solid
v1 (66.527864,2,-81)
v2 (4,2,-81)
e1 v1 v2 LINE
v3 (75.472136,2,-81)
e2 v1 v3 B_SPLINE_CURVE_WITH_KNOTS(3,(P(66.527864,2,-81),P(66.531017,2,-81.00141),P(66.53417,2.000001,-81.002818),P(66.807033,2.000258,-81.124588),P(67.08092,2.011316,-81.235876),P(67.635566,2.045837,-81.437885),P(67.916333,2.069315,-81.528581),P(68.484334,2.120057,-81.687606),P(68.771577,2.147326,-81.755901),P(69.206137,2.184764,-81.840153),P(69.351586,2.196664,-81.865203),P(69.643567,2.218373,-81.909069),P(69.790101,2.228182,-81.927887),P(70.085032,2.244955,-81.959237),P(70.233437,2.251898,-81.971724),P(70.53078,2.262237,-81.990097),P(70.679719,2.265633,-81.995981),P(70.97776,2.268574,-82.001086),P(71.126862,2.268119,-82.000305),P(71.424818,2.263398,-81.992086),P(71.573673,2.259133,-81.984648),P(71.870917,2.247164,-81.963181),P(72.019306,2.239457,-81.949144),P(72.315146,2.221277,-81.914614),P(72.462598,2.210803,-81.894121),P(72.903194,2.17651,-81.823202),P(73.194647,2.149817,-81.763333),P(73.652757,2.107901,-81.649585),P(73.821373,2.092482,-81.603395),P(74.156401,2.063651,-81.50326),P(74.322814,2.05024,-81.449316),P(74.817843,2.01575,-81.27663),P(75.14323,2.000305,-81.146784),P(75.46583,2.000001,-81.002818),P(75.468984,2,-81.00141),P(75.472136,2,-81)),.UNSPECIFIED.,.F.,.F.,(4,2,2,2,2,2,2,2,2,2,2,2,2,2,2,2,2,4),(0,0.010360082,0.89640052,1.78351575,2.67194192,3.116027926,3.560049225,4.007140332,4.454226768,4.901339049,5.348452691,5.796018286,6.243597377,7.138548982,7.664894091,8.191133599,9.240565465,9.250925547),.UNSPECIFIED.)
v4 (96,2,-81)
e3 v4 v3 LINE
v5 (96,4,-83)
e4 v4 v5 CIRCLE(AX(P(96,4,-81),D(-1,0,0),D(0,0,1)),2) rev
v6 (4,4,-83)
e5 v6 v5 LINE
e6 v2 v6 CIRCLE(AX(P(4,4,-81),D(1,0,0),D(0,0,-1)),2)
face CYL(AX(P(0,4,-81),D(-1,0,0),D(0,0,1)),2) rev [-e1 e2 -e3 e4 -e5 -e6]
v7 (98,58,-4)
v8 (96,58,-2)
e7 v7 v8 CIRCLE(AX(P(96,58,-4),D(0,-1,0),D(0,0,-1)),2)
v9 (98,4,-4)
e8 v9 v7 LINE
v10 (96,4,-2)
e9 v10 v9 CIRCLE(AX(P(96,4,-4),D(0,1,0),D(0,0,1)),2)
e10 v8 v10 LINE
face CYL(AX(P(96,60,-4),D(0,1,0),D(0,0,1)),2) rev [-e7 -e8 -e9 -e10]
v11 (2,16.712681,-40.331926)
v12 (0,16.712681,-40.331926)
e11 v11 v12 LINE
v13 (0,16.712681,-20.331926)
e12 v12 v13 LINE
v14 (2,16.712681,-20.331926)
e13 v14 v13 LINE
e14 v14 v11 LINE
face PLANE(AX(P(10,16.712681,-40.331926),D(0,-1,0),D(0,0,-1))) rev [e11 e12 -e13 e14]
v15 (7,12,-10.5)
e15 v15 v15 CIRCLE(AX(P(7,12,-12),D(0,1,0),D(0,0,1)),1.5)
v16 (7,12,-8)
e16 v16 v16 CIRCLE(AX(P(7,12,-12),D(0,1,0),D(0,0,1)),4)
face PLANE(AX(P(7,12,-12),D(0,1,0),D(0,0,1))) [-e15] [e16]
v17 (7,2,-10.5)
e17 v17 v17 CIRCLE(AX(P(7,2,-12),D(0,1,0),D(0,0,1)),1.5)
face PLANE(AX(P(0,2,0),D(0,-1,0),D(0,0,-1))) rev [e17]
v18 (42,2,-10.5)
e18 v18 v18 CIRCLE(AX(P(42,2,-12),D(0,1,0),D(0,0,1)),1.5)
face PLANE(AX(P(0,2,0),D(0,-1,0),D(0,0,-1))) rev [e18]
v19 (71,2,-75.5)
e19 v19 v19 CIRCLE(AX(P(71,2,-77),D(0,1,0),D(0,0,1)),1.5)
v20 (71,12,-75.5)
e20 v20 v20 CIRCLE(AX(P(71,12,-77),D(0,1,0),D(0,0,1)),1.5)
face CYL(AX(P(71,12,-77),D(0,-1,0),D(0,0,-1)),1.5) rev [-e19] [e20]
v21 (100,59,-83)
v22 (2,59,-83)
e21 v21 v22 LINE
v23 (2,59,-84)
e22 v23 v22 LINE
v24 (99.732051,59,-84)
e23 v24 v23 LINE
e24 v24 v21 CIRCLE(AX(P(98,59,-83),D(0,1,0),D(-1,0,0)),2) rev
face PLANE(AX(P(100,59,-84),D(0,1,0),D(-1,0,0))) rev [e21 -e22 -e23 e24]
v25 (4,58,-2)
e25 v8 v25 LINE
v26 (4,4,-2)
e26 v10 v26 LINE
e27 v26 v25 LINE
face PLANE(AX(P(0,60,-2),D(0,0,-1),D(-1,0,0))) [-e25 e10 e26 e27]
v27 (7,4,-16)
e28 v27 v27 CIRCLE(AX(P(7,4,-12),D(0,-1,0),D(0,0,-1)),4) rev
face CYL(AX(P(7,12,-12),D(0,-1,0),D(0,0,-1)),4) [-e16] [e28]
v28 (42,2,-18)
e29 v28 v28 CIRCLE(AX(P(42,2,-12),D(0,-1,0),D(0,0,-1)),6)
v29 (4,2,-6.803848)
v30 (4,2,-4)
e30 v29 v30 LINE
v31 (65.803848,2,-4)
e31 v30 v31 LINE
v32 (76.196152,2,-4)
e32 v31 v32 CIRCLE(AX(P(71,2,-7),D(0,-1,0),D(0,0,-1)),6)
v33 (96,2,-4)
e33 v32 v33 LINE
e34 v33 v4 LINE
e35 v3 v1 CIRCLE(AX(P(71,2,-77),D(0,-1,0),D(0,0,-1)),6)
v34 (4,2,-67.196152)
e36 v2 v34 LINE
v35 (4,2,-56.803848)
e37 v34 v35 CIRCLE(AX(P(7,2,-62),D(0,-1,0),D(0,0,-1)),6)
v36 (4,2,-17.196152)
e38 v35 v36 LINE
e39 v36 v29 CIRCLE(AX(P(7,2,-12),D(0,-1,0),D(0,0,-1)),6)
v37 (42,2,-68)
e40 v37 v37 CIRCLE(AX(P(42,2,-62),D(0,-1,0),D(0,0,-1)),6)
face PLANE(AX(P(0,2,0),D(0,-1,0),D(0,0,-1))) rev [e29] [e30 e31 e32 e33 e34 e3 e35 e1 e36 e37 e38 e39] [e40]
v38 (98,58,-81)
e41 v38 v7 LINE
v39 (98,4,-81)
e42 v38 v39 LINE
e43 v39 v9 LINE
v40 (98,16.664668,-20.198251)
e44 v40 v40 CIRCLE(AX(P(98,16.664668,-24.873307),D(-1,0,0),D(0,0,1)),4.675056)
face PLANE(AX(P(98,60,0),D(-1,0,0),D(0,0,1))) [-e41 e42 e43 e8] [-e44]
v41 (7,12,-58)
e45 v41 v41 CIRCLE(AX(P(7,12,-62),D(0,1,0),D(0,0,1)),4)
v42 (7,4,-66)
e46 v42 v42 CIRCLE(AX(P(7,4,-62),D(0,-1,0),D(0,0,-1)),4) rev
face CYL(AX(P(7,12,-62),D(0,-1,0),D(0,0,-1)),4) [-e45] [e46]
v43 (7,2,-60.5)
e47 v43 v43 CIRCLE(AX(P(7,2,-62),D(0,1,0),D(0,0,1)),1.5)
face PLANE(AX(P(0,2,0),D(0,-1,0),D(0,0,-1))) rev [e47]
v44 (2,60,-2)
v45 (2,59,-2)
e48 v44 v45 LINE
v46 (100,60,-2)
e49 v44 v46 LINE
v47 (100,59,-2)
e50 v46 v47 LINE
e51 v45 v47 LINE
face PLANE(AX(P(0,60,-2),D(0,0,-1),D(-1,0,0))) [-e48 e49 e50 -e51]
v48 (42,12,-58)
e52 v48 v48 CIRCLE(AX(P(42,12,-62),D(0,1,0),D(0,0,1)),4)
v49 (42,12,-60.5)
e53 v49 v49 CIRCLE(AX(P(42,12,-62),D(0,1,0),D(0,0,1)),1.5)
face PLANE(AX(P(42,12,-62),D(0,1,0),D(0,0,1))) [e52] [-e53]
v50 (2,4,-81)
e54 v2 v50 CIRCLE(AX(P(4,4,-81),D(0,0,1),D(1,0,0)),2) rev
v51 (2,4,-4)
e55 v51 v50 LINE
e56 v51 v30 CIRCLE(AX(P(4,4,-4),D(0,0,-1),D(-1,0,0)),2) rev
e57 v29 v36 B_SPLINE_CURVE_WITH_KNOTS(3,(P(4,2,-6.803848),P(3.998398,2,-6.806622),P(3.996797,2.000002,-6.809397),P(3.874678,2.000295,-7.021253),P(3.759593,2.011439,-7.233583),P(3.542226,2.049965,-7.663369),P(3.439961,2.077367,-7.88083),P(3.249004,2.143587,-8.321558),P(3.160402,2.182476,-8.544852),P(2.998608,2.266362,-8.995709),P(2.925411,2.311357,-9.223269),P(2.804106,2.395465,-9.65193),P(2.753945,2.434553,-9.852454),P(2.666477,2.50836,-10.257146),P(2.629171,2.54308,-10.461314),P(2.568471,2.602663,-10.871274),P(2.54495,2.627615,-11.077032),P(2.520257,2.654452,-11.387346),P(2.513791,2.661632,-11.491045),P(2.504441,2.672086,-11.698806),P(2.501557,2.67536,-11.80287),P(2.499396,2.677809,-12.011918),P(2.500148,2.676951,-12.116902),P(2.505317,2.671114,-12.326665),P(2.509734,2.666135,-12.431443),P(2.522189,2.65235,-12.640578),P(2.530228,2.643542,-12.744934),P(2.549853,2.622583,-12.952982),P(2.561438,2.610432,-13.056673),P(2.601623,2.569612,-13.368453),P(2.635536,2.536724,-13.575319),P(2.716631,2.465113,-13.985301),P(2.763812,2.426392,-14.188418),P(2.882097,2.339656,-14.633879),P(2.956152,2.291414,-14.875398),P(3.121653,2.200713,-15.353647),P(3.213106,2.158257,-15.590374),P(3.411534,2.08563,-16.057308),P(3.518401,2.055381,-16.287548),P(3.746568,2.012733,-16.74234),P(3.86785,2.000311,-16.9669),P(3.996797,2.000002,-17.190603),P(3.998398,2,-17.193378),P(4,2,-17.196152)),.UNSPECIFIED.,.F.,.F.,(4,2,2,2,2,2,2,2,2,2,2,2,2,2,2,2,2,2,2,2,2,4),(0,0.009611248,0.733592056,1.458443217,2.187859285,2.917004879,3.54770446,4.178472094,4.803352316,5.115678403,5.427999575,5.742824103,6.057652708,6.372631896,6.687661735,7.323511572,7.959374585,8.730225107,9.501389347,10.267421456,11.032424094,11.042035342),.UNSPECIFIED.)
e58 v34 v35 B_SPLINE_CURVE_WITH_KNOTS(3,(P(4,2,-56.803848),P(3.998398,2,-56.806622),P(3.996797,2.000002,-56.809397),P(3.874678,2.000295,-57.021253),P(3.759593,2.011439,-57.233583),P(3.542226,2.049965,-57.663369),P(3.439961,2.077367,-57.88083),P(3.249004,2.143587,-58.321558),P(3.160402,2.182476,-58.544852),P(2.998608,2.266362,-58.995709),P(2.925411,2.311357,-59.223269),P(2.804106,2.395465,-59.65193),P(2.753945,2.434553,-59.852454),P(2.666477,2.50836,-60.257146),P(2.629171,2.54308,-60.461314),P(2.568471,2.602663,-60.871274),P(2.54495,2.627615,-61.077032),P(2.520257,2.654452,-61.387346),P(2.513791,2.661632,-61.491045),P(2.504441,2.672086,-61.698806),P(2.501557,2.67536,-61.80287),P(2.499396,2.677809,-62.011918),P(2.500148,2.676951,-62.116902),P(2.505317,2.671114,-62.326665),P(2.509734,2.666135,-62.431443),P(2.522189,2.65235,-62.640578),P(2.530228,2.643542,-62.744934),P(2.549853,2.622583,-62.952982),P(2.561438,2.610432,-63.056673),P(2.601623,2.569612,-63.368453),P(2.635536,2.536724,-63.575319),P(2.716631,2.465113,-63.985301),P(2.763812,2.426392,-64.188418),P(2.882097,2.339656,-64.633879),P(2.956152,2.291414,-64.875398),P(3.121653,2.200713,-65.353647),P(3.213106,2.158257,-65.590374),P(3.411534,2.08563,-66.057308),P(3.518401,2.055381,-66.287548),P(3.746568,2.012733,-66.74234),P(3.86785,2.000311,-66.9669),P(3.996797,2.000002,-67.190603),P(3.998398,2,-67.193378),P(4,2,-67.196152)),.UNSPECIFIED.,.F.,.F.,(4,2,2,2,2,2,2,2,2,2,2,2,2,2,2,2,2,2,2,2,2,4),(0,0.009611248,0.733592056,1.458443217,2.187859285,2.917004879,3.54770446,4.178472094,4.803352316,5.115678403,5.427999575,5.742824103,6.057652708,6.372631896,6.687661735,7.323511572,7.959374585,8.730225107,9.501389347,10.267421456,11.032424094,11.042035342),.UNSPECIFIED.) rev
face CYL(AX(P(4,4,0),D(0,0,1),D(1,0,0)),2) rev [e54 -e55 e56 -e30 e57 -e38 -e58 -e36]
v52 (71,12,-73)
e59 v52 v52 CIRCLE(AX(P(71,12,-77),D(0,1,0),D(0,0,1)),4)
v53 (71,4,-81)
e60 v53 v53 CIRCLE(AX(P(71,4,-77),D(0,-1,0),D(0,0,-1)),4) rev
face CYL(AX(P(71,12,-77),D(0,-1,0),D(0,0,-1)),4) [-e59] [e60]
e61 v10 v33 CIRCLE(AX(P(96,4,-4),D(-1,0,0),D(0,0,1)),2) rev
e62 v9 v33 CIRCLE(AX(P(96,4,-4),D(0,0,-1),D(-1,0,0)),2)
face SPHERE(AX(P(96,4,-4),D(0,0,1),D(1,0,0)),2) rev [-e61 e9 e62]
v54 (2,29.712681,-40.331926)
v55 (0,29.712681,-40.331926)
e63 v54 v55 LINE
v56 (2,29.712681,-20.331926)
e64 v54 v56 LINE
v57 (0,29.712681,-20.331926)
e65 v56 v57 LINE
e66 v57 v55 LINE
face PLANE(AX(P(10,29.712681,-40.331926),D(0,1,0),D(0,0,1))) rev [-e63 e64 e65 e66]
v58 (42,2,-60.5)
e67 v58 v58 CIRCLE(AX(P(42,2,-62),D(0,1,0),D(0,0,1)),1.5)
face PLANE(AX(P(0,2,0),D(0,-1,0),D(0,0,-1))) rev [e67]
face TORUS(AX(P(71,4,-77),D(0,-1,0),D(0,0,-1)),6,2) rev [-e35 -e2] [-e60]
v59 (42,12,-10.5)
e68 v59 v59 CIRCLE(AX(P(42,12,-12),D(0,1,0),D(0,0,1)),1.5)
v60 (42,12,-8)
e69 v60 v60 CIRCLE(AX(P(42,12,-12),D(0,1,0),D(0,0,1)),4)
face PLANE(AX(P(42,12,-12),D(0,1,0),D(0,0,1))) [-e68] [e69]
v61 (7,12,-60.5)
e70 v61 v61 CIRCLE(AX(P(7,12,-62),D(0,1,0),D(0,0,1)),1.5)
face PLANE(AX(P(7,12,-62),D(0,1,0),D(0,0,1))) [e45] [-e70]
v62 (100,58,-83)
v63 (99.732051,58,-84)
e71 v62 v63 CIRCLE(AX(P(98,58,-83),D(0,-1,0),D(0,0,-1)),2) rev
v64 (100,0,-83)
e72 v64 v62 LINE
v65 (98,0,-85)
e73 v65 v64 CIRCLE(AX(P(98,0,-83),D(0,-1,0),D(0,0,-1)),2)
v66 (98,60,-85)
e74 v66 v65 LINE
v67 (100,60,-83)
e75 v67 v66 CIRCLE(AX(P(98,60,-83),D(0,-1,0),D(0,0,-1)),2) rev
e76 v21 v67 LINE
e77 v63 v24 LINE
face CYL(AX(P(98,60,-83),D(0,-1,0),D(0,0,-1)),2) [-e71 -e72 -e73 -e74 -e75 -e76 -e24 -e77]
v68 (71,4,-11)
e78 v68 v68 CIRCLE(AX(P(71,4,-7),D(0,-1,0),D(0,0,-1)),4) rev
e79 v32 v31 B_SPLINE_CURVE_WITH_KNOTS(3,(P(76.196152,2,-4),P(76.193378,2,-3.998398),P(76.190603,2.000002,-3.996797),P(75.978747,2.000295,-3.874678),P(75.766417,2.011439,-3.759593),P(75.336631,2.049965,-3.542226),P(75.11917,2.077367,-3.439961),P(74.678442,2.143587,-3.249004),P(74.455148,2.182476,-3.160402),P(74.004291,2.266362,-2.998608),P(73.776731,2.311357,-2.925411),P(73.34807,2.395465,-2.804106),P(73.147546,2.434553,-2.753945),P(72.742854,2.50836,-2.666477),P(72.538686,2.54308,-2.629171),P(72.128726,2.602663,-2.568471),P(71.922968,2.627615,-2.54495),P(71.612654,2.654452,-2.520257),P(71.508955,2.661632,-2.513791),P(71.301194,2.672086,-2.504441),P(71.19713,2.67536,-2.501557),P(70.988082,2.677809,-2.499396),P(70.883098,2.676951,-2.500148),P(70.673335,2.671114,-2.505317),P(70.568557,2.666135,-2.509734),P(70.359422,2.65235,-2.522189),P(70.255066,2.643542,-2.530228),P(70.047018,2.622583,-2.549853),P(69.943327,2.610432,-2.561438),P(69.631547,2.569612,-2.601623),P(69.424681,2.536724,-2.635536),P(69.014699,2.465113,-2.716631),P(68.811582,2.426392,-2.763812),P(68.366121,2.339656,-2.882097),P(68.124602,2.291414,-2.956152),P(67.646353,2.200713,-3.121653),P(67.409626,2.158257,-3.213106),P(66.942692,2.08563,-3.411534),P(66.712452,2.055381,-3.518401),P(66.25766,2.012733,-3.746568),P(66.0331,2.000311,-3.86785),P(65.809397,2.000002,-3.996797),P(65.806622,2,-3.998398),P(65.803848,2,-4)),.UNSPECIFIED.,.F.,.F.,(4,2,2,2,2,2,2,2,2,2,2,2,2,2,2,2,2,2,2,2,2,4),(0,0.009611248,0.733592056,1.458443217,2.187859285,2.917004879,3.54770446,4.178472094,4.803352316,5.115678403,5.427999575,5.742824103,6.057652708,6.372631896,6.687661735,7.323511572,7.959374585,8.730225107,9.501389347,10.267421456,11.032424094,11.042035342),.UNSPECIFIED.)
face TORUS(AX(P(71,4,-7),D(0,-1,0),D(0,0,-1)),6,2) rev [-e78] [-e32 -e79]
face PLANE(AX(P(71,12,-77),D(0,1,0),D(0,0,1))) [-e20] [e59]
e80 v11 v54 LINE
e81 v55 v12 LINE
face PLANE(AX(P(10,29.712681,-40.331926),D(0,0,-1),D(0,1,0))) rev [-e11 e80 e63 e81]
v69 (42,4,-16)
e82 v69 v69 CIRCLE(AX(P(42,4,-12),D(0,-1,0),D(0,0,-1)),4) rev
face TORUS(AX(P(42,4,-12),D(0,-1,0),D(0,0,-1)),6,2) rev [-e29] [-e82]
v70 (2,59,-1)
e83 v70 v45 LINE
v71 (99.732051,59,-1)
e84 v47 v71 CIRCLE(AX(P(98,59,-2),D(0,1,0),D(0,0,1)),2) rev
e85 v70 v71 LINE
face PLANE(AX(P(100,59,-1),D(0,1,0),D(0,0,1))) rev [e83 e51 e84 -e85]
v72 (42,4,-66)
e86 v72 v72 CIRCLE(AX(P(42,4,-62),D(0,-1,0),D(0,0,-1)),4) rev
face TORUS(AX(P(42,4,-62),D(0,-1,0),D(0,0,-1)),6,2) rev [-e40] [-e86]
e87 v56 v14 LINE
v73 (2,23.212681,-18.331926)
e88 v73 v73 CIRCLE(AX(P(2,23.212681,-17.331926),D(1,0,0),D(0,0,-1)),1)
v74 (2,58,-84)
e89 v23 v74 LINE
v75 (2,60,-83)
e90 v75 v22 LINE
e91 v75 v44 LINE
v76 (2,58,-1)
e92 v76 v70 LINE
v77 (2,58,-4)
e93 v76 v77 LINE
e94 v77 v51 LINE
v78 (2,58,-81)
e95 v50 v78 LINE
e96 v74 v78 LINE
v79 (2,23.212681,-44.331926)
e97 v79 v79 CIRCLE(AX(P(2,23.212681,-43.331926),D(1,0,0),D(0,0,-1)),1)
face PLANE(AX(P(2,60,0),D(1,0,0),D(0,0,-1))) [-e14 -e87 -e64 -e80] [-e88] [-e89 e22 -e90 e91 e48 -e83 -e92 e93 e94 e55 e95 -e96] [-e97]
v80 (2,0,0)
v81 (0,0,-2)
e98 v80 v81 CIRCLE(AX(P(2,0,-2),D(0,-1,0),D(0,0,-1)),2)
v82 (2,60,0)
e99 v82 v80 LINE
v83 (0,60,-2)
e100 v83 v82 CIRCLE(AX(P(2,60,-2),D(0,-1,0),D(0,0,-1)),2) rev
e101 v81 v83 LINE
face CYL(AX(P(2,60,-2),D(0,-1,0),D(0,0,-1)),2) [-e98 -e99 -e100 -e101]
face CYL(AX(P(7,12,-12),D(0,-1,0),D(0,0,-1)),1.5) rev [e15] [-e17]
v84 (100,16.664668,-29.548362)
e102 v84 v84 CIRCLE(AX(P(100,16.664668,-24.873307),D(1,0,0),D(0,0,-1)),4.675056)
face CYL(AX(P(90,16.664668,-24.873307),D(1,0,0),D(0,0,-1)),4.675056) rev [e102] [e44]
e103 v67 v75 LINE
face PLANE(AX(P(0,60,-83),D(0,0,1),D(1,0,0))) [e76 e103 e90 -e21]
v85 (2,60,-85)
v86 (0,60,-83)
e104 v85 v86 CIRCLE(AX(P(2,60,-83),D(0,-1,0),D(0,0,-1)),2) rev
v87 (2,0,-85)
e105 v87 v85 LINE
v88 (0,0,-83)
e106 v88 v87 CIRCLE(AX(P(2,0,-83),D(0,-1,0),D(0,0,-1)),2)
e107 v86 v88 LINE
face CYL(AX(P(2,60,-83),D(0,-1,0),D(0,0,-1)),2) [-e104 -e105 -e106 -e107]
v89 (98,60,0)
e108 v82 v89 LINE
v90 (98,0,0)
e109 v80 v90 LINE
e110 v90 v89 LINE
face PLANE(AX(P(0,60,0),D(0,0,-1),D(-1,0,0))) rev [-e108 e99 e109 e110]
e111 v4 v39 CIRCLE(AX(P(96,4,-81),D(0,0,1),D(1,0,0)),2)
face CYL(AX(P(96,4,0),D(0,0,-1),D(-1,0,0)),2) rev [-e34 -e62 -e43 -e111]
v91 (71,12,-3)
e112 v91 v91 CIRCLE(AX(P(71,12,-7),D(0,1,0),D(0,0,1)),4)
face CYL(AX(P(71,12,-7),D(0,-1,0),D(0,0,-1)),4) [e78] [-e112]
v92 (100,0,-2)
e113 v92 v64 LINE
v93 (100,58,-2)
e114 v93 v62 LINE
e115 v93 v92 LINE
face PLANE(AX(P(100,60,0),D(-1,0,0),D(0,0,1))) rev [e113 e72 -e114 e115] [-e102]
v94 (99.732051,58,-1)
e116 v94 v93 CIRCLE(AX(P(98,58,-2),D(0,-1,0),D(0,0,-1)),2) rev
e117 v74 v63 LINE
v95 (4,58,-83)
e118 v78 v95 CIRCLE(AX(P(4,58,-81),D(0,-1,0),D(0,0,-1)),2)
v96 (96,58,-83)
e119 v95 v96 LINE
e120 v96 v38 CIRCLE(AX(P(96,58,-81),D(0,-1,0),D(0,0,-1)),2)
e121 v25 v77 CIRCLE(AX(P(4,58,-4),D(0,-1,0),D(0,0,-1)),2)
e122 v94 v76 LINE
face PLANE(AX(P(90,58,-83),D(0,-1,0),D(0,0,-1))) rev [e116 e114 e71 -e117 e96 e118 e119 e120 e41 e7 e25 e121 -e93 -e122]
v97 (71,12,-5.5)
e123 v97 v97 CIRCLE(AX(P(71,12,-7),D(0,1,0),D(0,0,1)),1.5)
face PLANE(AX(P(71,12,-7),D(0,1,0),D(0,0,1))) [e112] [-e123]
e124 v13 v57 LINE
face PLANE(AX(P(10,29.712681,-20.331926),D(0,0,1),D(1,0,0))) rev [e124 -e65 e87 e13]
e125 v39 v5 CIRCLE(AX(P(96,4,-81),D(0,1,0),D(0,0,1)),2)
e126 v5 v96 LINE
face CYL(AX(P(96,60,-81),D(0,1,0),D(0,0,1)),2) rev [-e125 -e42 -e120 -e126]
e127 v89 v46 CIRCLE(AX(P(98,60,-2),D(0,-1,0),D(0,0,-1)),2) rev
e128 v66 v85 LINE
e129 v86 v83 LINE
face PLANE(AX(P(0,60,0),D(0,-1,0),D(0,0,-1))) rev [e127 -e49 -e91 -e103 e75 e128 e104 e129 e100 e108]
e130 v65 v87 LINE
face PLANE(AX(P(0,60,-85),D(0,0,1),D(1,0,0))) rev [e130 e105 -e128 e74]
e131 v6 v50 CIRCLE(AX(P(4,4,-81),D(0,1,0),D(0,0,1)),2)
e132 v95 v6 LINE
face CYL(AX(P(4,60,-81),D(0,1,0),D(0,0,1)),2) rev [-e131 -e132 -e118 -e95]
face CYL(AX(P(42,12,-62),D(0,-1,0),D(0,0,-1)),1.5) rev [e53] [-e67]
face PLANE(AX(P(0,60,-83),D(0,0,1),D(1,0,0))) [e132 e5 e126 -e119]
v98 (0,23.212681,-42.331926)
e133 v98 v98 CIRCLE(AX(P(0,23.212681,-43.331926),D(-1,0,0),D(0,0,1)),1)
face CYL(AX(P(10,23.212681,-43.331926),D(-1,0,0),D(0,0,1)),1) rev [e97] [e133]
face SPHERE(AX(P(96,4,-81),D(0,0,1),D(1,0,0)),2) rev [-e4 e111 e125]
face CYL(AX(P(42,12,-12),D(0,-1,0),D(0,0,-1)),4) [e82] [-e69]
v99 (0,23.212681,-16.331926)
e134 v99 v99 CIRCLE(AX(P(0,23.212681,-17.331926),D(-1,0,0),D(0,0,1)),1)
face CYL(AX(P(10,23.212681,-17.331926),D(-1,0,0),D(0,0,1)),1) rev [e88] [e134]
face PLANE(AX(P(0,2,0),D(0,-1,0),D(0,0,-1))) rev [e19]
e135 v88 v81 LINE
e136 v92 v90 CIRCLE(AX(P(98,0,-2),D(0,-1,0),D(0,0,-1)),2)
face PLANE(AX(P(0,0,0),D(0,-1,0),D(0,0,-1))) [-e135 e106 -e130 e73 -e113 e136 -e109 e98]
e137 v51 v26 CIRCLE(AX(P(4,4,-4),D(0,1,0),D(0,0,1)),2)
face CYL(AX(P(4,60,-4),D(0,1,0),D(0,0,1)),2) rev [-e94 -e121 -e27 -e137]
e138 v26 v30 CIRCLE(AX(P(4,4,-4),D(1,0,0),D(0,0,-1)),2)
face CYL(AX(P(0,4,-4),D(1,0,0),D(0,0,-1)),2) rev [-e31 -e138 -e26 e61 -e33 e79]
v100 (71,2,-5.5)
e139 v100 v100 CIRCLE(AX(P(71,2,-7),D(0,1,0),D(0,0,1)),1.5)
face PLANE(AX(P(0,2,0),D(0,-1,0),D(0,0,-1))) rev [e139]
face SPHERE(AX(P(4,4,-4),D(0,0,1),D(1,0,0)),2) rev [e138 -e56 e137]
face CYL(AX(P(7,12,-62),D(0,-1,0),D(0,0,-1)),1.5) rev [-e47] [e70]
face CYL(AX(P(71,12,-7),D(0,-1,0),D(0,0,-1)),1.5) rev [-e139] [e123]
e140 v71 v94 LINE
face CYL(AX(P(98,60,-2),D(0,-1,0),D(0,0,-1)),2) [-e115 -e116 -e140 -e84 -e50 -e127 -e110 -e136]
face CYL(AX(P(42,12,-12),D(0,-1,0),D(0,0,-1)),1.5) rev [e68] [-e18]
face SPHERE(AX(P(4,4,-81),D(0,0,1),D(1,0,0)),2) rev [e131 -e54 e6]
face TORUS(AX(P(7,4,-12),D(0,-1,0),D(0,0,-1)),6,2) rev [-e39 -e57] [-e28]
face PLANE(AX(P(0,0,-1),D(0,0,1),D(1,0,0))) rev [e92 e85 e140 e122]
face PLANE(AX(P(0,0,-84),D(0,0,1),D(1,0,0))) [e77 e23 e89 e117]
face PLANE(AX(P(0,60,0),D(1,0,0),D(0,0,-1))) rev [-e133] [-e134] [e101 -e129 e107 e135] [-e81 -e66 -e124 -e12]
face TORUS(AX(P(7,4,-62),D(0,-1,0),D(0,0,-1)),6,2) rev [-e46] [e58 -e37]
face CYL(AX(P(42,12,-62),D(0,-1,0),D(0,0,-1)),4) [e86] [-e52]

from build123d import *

# Parameters (mm, degrees)
SKETCH2_W           = 100
SKETCH2_H           = 85
BOSS_EXTRUDE1_DEPTH = 60
SHELL1_T            = -2
SKETCH3_R           = 4
SKETCH3_R_2         = 1.5
BOSS_EXTRUDE2_DEPTH = 10
SKETCH4_R           = 1
SKETCH4_W           = 20
SKETCH4_H           = 13
CUT_EXTRUDE1_DEPTH  = 10
SKETCH5_R           = 4.675055564
CUT_EXTRUDE2_DEPTH  = 10
SKETCH6_W           = 81
SKETCH6_H           = 2
CUT_EXTRUDE3_DEPTH  = 10
SKETCH7_W           = 98
SKETCH7_H           = 1
CUT_EXTRUDE4_DEPTH  = 1
SKETCH8_W           = 98
SKETCH8_H           = 1
CUT_EXTRUDE5_DEPTH  = 1
FILLET1_R           = 2


with BuildPart() as part:
    # Sketch2 → Boss-Extrude1 (new body)
    with BuildSketch(Plane(origin=(0, 0, 0), x_dir=(1, 0, 0), z_dir=(0, 1, 0))):
        with Locations((50, 42.5)):
            Rectangle(SKETCH2_W, SKETCH2_H)
    extrude(amount=BOSS_EXTRUDE1_DEPTH)

    # Shell1
    shell1_openings = [part.faces().sort_by_distance(p)[0] for p in [
        (50, 60, -42.5),
    ]]
    offset(amount=SHELL1_T, openings=shell1_openings, kind=Kind.INTERSECTION)

    # Sketch3 → Boss-Extrude2 (add)
    # profile 1 of 6: a face of its own
    with BuildSketch(Plane(origin=(0, 2, 0), x_dir=(1, 0, 0), z_dir=(0, 1, 0))):
        with Locations(Location((7, 62, 0), (0, 0, 90))):
            Circle(SKETCH3_R)
        with Locations(Location((7, 62, 0), (0, 0, 270))):
            Circle(SKETCH3_R_2, mode=Mode.SUBTRACT)
    # profile 2 of 6: a face of its own
    with BuildSketch(Plane(origin=(0, 2, 0), x_dir=(1, 0, 0), z_dir=(0, 1, 0))):
        with Locations(Location((7, 12, 0), (0, 0, 90))):
            Circle(SKETCH3_R)
        with Locations(Location((7, 12, 0), (0, 0, 270))):
            Circle(SKETCH3_R_2, mode=Mode.SUBTRACT)
    # profile 3 of 6: a face of its own
    with BuildSketch(Plane(origin=(0, 2, 0), x_dir=(1, 0, 0), z_dir=(0, 1, 0))):
        with Locations(Location((42, 12, 0), (0, 0, 90))):
            Circle(SKETCH3_R)
        with Locations(Location((42, 12, 0), (0, 0, 270))):
            Circle(SKETCH3_R_2, mode=Mode.SUBTRACT)
    # profile 4 of 6: a face of its own
    with BuildSketch(Plane(origin=(0, 2, 0), x_dir=(1, 0, 0), z_dir=(0, 1, 0))):
        with Locations(Location((42, 62, 0), (0, 0, 90))):
            Circle(SKETCH3_R)
        with Locations(Location((42, 62, 0), (0, 0, 270))):
            Circle(SKETCH3_R_2, mode=Mode.SUBTRACT)
    # profile 5 of 6: a face of its own
    with BuildSketch(Plane(origin=(0, 2, 0), x_dir=(1, 0, 0), z_dir=(0, 1, 0))):
        with Locations(Location((71, 7, 0), (0, 0, 90))):
            Circle(SKETCH3_R)
        with Locations(Location((71, 7, 0), (0, 0, 270))):
            Circle(SKETCH3_R_2, mode=Mode.SUBTRACT)
    # profile 6 of 6: a face of its own
    with BuildSketch(Plane(origin=(0, 2, 0), x_dir=(1, 0, 0), z_dir=(0, 1, 0))):
        with Locations(Location((71, 77, 0), (0, 0, 90))):
            Circle(SKETCH3_R)
        with Locations(Location((71, 77, 0), (0, 0, 270))):
            Circle(SKETCH3_R_2, mode=Mode.SUBTRACT)
    extrude(amount=BOSS_EXTRUDE2_DEPTH)

    # Sketch4 → Cut-Extrude1 (cut)
    with BuildSketch(Plane.ZY):
        with Locations((-43.331926362, 23.212680524)):
            Circle(SKETCH4_R)
        with Locations((-17.331926362, 23.212680524)):
            Circle(SKETCH4_R)
        with Locations((-30.331926362, 23.212680524)):
            Rectangle(SKETCH4_W, SKETCH4_H)
    extrude(amount=-CUT_EXTRUDE1_DEPTH, mode=Mode.SUBTRACT)

    # Sketch5 → Cut-Extrude2 (cut)
    with BuildSketch(Plane(origin=(100, 0, 0), x_dir=(0, 0, -1), z_dir=(1, 0, 0))):
        with Locations((24.873306917, 16.664667804)):
            Circle(SKETCH5_R)
    extrude(amount=-CUT_EXTRUDE2_DEPTH, mode=Mode.SUBTRACT)

    # Sketch6 → Cut-Extrude3 (cut)
    with BuildSketch(Plane(origin=(100, 0, 0), x_dir=(0, 0, -1), z_dir=(1, 0, 0))):
        with Locations((42.5, 59)):
            Rectangle(SKETCH6_W, SKETCH6_H)
    extrude(amount=-CUT_EXTRUDE3_DEPTH, mode=Mode.SUBTRACT)

    # Sketch7 → Cut-Extrude4 (cut)
    with BuildSketch(Plane.XY.offset(-83)):
        with Locations((51, 58.5)):
            Rectangle(SKETCH7_W, SKETCH7_H)
    extrude(amount=-CUT_EXTRUDE4_DEPTH, mode=Mode.SUBTRACT)

    # Sketch8 → Cut-Extrude5 (cut)
    with BuildSketch(Plane(origin=(0, 0, -2), x_dir=(-1, 0, 0), z_dir=(0, 0, -1))):
        with Locations((-51, 58.5)):
            Rectangle(SKETCH8_W, SKETCH8_H)
    extrude(amount=-CUT_EXTRUDE5_DEPTH, mode=Mode.SUBTRACT)

    # Fillet1
    # the kernel refuses this fillet: 2 mm, written as the material it adds along each edge
    with BuildSketch(Plane(origin=(4, 4, -4), x_dir=(0, -1, 0), z_dir=(0, 0, 1))) as fillet1_piece_1_section:
        Polygon((0, 0), (FILLET1_R * 1.02, 0), (FILLET1_R * 1.02, -FILLET1_R * 1.02), (0, -FILLET1_R * 1.02), align=None)
    fillet1_piece_1 = extrude(amount=FILLET1_R * 1.02, mode=Mode.PRIVATE)
    fillet1_piece_1 = fillet1_piece_1 - Plane(origin=(4, 4, -4), x_dir=(0.7071067811865475, 0.7071067811865475, 0), z_dir=(0, 0, 1)) * Sphere(FILLET1_R, mode=Mode.PRIVATE)
    add(fillet1_piece_1)
    with BuildSketch(Plane(origin=(96, 4, -4), x_dir=(0, -1, 0), z_dir=(0, 0, 1))) as fillet1_piece_2_section:
        Polygon((0, 0), (FILLET1_R * 1.02, 0), (FILLET1_R * 1.02, FILLET1_R * 1.02), (0, FILLET1_R * 1.02), align=None)
    fillet1_piece_2 = extrude(amount=FILLET1_R * 1.02, mode=Mode.PRIVATE)
    fillet1_piece_2 = fillet1_piece_2 - Plane(origin=(96, 4, -4), x_dir=(-0.7071067811865475, 0.7071067811865475, 0), z_dir=(0, 0, 1)) * Sphere(FILLET1_R, mode=Mode.PRIVATE)
    add(fillet1_piece_2)
    with BuildSketch(Plane(origin=(96, 4, -81), x_dir=(1, 0, 0), z_dir=(0, -1, 0))) as fillet1_piece_3_section:
        Polygon((0, 0), (FILLET1_R * 1.02, 0), (FILLET1_R * 1.02, -FILLET1_R * 1.02), (0, -FILLET1_R * 1.02), align=None)
    fillet1_piece_3 = extrude(amount=FILLET1_R * 1.02, mode=Mode.PRIVATE)
    fillet1_piece_3 = fillet1_piece_3 - Plane(origin=(96, 4, -81), x_dir=(-0.7071067811865475, 0, 0.7071067811865475), z_dir=(0, -1, 0)) * Sphere(FILLET1_R, mode=Mode.PRIVATE)
    add(fillet1_piece_3)
    with BuildSketch(Plane(origin=(4, 4, -81), x_dir=(0, 0, -1), z_dir=(0, -1, 0))) as fillet1_piece_4_section:
        Polygon((0, 0), (FILLET1_R * 1.02, 0), (FILLET1_R * 1.02, -FILLET1_R * 1.02), (0, -FILLET1_R * 1.02), align=None)
    fillet1_piece_4 = extrude(amount=FILLET1_R * 1.02, mode=Mode.PRIVATE)
    fillet1_piece_4 = fillet1_piece_4 - Plane(origin=(4, 4, -81), x_dir=(0.7071067811865475, 0, 0.7071067811865475), z_dir=(0, -1, 0)) * Sphere(FILLET1_R, mode=Mode.PRIVATE)
    add(fillet1_piece_4)
    with BuildSketch(Plane(origin=(7, 2, -62), x_dir=(0, 0, -1), z_dir=(1, 0, 0))) as fillet1_piece_5:
        with BuildLine():
            CenterArc((4 + FILLET1_R, FILLET1_R), FILLET1_R, 180, 90)
            Line((4, FILLET1_R), (4, 0))
            Line((4, 0), (4 + FILLET1_R, 0))
        make_face()
    revolve(axis=Axis((7, 2, -62), (0, 1, 0)))
    with BuildSketch(Plane(origin=(7, 2, -12), x_dir=(0, 0, -1), z_dir=(1, 0, 0))) as fillet1_piece_6:
        with BuildLine():
            CenterArc((4 + FILLET1_R, FILLET1_R), FILLET1_R, 180, 90)
            Line((4, FILLET1_R), (4, 0))
            Line((4, 0), (4 + FILLET1_R, 0))
        make_face()
    revolve(axis=Axis((7, 2, -12), (0, 1, 0)))
    with BuildSketch(Plane(origin=(71, 2, -77), x_dir=(0, 0, -1), z_dir=(1, 0, 0))) as fillet1_piece_7:
        with BuildLine():
            CenterArc((4 + FILLET1_R, FILLET1_R), FILLET1_R, 180, 90)
            Line((4, FILLET1_R), (4, 0))
            Line((4, 0), (4 + FILLET1_R, 0))
        make_face()
    revolve(axis=Axis((71, 2, -77), (0, 1, 0)))
    with BuildSketch(Plane(origin=(42, 2, -62), x_dir=(0, 0, -1), z_dir=(1, 0, 0))) as fillet1_piece_8:
        with BuildLine():
            CenterArc((4 + FILLET1_R, FILLET1_R), FILLET1_R, 180, 90)
            Line((4, FILLET1_R), (4, 0))
            Line((4, 0), (4 + FILLET1_R, 0))
        make_face()
    revolve(axis=Axis((42, 2, -62), (0, 1, 0)))
    with BuildSketch(Plane(origin=(42, 2, -12), x_dir=(0, 0, -1), z_dir=(1, 0, 0))) as fillet1_piece_9:
        with BuildLine():
            CenterArc((4 + FILLET1_R, FILLET1_R), FILLET1_R, 180, 90)
            Line((4, FILLET1_R), (4, 0))
            Line((4, 0), (4 + FILLET1_R, 0))
        make_face()
    revolve(axis=Axis((42, 2, -12), (0, 1, 0)))
    with BuildSketch(Plane(origin=(71, 2, -7), x_dir=(0, 0, -1), z_dir=(1, 0, 0))) as fillet1_piece_10:
        with BuildLine():
            CenterArc((4 + FILLET1_R, FILLET1_R), FILLET1_R, 180, 90)
            Line((4, FILLET1_R), (4, 0))
            Line((4, 0), (4 + FILLET1_R, 0))
        make_face()
    revolve(axis=Axis((71, 2, -7), (0, 1, 0)))
    with BuildSketch(Plane(origin=(4, 2, -2), x_dir=(0, 1, 0), z_dir=(1, 0, 0))) as fillet1_piece_11:
        with BuildLine():
            CenterArc((FILLET1_R, -FILLET1_R), FILLET1_R, 90, 90)
            Line((0, -FILLET1_R), (0, 0))
            Line((0, 0), (FILLET1_R, 0))
        make_face()
    extrude(amount=92)
    with BuildSketch(Plane(origin=(98, 2, -4), x_dir=(-1, 0, 0), z_dir=(0, 0, -1)), Plane(origin=(2, 2, -81), x_dir=(1, 0, 0), z_dir=(0, 0, 1))) as fillet1_piece_12:
        with BuildLine():
            CenterArc((FILLET1_R, FILLET1_R), FILLET1_R, 180, 90)
            Line((0, FILLET1_R), (0, 0))
            Line((0, 0), (FILLET1_R, 0))
        make_face()
    extrude(amount=77)
    with BuildSketch(Plane(origin=(96, 2, -83), x_dir=(0, 0, 1), z_dir=(-1, 0, 0))) as fillet1_piece_13:
        with BuildLine():
            CenterArc((FILLET1_R, FILLET1_R), FILLET1_R, 180, 90)
            Line((0, FILLET1_R), (0, 0))
            Line((0, 0), (FILLET1_R, 0))
        make_face()
    extrude(amount=92)
    with BuildSketch(Plane(origin=(2, 4, -83), x_dir=(1, 0, 0), z_dir=(0, 1, 0)), Plane(origin=(98, 4, -83), x_dir=(0, 0, 1), z_dir=(0, 1, 0)), Plane(origin=(98, 4, -2), x_dir=(-1, 0, 0), z_dir=(0, 1, 0)), Plane(origin=(2, 58, -2), x_dir=(1, 0, 0), z_dir=(0, -1, 0))) as fillet1_piece_14:
        with BuildLine():
            CenterArc((FILLET1_R, -FILLET1_R), FILLET1_R, 90, 90)
            Line((0, -FILLET1_R), (0, 0))
            Line((0, 0), (FILLET1_R, 0))
        make_face()
    extrude(amount=54)
    # the kernel refuses this fillet: 2 mm, written as the material it takes off along each edge
    with BuildSketch(Plane(origin=(100, -5, 0), x_dir=(-1, 0, 0), z_dir=(0, 1, 0)), Plane(origin=(0, -5, -85), x_dir=(1, 0, 0), z_dir=(0, 1, 0))) as fillet1_2_piece_1:
        with BuildLine():
            CenterArc((FILLET1_R, -FILLET1_R), FILLET1_R, 90, 90)
            Line((0, -FILLET1_R), (0, 0))
            Line((0, 0), (FILLET1_R, 0))
        make_face()
    extrude(amount=70, mode=Mode.SUBTRACT)
    with BuildSketch(Plane(origin=(100, -5, -85), x_dir=(-1, 0, 0), z_dir=(0, 1, 0)), Plane(origin=(0, -5, 0), x_dir=(1, 0, 0), z_dir=(0, 1, 0))) as fillet1_2_piece_2:
        with BuildLine():
            CenterArc((FILLET1_R, FILLET1_R), FILLET1_R, 180, 90)
            Line((0, FILLET1_R), (0, 0))
            Line((0, 0), (FILLET1_R, 0))
        make_face()
    extrude(amount=70, mode=Mode.SUBTRACT)


solid = part.part
